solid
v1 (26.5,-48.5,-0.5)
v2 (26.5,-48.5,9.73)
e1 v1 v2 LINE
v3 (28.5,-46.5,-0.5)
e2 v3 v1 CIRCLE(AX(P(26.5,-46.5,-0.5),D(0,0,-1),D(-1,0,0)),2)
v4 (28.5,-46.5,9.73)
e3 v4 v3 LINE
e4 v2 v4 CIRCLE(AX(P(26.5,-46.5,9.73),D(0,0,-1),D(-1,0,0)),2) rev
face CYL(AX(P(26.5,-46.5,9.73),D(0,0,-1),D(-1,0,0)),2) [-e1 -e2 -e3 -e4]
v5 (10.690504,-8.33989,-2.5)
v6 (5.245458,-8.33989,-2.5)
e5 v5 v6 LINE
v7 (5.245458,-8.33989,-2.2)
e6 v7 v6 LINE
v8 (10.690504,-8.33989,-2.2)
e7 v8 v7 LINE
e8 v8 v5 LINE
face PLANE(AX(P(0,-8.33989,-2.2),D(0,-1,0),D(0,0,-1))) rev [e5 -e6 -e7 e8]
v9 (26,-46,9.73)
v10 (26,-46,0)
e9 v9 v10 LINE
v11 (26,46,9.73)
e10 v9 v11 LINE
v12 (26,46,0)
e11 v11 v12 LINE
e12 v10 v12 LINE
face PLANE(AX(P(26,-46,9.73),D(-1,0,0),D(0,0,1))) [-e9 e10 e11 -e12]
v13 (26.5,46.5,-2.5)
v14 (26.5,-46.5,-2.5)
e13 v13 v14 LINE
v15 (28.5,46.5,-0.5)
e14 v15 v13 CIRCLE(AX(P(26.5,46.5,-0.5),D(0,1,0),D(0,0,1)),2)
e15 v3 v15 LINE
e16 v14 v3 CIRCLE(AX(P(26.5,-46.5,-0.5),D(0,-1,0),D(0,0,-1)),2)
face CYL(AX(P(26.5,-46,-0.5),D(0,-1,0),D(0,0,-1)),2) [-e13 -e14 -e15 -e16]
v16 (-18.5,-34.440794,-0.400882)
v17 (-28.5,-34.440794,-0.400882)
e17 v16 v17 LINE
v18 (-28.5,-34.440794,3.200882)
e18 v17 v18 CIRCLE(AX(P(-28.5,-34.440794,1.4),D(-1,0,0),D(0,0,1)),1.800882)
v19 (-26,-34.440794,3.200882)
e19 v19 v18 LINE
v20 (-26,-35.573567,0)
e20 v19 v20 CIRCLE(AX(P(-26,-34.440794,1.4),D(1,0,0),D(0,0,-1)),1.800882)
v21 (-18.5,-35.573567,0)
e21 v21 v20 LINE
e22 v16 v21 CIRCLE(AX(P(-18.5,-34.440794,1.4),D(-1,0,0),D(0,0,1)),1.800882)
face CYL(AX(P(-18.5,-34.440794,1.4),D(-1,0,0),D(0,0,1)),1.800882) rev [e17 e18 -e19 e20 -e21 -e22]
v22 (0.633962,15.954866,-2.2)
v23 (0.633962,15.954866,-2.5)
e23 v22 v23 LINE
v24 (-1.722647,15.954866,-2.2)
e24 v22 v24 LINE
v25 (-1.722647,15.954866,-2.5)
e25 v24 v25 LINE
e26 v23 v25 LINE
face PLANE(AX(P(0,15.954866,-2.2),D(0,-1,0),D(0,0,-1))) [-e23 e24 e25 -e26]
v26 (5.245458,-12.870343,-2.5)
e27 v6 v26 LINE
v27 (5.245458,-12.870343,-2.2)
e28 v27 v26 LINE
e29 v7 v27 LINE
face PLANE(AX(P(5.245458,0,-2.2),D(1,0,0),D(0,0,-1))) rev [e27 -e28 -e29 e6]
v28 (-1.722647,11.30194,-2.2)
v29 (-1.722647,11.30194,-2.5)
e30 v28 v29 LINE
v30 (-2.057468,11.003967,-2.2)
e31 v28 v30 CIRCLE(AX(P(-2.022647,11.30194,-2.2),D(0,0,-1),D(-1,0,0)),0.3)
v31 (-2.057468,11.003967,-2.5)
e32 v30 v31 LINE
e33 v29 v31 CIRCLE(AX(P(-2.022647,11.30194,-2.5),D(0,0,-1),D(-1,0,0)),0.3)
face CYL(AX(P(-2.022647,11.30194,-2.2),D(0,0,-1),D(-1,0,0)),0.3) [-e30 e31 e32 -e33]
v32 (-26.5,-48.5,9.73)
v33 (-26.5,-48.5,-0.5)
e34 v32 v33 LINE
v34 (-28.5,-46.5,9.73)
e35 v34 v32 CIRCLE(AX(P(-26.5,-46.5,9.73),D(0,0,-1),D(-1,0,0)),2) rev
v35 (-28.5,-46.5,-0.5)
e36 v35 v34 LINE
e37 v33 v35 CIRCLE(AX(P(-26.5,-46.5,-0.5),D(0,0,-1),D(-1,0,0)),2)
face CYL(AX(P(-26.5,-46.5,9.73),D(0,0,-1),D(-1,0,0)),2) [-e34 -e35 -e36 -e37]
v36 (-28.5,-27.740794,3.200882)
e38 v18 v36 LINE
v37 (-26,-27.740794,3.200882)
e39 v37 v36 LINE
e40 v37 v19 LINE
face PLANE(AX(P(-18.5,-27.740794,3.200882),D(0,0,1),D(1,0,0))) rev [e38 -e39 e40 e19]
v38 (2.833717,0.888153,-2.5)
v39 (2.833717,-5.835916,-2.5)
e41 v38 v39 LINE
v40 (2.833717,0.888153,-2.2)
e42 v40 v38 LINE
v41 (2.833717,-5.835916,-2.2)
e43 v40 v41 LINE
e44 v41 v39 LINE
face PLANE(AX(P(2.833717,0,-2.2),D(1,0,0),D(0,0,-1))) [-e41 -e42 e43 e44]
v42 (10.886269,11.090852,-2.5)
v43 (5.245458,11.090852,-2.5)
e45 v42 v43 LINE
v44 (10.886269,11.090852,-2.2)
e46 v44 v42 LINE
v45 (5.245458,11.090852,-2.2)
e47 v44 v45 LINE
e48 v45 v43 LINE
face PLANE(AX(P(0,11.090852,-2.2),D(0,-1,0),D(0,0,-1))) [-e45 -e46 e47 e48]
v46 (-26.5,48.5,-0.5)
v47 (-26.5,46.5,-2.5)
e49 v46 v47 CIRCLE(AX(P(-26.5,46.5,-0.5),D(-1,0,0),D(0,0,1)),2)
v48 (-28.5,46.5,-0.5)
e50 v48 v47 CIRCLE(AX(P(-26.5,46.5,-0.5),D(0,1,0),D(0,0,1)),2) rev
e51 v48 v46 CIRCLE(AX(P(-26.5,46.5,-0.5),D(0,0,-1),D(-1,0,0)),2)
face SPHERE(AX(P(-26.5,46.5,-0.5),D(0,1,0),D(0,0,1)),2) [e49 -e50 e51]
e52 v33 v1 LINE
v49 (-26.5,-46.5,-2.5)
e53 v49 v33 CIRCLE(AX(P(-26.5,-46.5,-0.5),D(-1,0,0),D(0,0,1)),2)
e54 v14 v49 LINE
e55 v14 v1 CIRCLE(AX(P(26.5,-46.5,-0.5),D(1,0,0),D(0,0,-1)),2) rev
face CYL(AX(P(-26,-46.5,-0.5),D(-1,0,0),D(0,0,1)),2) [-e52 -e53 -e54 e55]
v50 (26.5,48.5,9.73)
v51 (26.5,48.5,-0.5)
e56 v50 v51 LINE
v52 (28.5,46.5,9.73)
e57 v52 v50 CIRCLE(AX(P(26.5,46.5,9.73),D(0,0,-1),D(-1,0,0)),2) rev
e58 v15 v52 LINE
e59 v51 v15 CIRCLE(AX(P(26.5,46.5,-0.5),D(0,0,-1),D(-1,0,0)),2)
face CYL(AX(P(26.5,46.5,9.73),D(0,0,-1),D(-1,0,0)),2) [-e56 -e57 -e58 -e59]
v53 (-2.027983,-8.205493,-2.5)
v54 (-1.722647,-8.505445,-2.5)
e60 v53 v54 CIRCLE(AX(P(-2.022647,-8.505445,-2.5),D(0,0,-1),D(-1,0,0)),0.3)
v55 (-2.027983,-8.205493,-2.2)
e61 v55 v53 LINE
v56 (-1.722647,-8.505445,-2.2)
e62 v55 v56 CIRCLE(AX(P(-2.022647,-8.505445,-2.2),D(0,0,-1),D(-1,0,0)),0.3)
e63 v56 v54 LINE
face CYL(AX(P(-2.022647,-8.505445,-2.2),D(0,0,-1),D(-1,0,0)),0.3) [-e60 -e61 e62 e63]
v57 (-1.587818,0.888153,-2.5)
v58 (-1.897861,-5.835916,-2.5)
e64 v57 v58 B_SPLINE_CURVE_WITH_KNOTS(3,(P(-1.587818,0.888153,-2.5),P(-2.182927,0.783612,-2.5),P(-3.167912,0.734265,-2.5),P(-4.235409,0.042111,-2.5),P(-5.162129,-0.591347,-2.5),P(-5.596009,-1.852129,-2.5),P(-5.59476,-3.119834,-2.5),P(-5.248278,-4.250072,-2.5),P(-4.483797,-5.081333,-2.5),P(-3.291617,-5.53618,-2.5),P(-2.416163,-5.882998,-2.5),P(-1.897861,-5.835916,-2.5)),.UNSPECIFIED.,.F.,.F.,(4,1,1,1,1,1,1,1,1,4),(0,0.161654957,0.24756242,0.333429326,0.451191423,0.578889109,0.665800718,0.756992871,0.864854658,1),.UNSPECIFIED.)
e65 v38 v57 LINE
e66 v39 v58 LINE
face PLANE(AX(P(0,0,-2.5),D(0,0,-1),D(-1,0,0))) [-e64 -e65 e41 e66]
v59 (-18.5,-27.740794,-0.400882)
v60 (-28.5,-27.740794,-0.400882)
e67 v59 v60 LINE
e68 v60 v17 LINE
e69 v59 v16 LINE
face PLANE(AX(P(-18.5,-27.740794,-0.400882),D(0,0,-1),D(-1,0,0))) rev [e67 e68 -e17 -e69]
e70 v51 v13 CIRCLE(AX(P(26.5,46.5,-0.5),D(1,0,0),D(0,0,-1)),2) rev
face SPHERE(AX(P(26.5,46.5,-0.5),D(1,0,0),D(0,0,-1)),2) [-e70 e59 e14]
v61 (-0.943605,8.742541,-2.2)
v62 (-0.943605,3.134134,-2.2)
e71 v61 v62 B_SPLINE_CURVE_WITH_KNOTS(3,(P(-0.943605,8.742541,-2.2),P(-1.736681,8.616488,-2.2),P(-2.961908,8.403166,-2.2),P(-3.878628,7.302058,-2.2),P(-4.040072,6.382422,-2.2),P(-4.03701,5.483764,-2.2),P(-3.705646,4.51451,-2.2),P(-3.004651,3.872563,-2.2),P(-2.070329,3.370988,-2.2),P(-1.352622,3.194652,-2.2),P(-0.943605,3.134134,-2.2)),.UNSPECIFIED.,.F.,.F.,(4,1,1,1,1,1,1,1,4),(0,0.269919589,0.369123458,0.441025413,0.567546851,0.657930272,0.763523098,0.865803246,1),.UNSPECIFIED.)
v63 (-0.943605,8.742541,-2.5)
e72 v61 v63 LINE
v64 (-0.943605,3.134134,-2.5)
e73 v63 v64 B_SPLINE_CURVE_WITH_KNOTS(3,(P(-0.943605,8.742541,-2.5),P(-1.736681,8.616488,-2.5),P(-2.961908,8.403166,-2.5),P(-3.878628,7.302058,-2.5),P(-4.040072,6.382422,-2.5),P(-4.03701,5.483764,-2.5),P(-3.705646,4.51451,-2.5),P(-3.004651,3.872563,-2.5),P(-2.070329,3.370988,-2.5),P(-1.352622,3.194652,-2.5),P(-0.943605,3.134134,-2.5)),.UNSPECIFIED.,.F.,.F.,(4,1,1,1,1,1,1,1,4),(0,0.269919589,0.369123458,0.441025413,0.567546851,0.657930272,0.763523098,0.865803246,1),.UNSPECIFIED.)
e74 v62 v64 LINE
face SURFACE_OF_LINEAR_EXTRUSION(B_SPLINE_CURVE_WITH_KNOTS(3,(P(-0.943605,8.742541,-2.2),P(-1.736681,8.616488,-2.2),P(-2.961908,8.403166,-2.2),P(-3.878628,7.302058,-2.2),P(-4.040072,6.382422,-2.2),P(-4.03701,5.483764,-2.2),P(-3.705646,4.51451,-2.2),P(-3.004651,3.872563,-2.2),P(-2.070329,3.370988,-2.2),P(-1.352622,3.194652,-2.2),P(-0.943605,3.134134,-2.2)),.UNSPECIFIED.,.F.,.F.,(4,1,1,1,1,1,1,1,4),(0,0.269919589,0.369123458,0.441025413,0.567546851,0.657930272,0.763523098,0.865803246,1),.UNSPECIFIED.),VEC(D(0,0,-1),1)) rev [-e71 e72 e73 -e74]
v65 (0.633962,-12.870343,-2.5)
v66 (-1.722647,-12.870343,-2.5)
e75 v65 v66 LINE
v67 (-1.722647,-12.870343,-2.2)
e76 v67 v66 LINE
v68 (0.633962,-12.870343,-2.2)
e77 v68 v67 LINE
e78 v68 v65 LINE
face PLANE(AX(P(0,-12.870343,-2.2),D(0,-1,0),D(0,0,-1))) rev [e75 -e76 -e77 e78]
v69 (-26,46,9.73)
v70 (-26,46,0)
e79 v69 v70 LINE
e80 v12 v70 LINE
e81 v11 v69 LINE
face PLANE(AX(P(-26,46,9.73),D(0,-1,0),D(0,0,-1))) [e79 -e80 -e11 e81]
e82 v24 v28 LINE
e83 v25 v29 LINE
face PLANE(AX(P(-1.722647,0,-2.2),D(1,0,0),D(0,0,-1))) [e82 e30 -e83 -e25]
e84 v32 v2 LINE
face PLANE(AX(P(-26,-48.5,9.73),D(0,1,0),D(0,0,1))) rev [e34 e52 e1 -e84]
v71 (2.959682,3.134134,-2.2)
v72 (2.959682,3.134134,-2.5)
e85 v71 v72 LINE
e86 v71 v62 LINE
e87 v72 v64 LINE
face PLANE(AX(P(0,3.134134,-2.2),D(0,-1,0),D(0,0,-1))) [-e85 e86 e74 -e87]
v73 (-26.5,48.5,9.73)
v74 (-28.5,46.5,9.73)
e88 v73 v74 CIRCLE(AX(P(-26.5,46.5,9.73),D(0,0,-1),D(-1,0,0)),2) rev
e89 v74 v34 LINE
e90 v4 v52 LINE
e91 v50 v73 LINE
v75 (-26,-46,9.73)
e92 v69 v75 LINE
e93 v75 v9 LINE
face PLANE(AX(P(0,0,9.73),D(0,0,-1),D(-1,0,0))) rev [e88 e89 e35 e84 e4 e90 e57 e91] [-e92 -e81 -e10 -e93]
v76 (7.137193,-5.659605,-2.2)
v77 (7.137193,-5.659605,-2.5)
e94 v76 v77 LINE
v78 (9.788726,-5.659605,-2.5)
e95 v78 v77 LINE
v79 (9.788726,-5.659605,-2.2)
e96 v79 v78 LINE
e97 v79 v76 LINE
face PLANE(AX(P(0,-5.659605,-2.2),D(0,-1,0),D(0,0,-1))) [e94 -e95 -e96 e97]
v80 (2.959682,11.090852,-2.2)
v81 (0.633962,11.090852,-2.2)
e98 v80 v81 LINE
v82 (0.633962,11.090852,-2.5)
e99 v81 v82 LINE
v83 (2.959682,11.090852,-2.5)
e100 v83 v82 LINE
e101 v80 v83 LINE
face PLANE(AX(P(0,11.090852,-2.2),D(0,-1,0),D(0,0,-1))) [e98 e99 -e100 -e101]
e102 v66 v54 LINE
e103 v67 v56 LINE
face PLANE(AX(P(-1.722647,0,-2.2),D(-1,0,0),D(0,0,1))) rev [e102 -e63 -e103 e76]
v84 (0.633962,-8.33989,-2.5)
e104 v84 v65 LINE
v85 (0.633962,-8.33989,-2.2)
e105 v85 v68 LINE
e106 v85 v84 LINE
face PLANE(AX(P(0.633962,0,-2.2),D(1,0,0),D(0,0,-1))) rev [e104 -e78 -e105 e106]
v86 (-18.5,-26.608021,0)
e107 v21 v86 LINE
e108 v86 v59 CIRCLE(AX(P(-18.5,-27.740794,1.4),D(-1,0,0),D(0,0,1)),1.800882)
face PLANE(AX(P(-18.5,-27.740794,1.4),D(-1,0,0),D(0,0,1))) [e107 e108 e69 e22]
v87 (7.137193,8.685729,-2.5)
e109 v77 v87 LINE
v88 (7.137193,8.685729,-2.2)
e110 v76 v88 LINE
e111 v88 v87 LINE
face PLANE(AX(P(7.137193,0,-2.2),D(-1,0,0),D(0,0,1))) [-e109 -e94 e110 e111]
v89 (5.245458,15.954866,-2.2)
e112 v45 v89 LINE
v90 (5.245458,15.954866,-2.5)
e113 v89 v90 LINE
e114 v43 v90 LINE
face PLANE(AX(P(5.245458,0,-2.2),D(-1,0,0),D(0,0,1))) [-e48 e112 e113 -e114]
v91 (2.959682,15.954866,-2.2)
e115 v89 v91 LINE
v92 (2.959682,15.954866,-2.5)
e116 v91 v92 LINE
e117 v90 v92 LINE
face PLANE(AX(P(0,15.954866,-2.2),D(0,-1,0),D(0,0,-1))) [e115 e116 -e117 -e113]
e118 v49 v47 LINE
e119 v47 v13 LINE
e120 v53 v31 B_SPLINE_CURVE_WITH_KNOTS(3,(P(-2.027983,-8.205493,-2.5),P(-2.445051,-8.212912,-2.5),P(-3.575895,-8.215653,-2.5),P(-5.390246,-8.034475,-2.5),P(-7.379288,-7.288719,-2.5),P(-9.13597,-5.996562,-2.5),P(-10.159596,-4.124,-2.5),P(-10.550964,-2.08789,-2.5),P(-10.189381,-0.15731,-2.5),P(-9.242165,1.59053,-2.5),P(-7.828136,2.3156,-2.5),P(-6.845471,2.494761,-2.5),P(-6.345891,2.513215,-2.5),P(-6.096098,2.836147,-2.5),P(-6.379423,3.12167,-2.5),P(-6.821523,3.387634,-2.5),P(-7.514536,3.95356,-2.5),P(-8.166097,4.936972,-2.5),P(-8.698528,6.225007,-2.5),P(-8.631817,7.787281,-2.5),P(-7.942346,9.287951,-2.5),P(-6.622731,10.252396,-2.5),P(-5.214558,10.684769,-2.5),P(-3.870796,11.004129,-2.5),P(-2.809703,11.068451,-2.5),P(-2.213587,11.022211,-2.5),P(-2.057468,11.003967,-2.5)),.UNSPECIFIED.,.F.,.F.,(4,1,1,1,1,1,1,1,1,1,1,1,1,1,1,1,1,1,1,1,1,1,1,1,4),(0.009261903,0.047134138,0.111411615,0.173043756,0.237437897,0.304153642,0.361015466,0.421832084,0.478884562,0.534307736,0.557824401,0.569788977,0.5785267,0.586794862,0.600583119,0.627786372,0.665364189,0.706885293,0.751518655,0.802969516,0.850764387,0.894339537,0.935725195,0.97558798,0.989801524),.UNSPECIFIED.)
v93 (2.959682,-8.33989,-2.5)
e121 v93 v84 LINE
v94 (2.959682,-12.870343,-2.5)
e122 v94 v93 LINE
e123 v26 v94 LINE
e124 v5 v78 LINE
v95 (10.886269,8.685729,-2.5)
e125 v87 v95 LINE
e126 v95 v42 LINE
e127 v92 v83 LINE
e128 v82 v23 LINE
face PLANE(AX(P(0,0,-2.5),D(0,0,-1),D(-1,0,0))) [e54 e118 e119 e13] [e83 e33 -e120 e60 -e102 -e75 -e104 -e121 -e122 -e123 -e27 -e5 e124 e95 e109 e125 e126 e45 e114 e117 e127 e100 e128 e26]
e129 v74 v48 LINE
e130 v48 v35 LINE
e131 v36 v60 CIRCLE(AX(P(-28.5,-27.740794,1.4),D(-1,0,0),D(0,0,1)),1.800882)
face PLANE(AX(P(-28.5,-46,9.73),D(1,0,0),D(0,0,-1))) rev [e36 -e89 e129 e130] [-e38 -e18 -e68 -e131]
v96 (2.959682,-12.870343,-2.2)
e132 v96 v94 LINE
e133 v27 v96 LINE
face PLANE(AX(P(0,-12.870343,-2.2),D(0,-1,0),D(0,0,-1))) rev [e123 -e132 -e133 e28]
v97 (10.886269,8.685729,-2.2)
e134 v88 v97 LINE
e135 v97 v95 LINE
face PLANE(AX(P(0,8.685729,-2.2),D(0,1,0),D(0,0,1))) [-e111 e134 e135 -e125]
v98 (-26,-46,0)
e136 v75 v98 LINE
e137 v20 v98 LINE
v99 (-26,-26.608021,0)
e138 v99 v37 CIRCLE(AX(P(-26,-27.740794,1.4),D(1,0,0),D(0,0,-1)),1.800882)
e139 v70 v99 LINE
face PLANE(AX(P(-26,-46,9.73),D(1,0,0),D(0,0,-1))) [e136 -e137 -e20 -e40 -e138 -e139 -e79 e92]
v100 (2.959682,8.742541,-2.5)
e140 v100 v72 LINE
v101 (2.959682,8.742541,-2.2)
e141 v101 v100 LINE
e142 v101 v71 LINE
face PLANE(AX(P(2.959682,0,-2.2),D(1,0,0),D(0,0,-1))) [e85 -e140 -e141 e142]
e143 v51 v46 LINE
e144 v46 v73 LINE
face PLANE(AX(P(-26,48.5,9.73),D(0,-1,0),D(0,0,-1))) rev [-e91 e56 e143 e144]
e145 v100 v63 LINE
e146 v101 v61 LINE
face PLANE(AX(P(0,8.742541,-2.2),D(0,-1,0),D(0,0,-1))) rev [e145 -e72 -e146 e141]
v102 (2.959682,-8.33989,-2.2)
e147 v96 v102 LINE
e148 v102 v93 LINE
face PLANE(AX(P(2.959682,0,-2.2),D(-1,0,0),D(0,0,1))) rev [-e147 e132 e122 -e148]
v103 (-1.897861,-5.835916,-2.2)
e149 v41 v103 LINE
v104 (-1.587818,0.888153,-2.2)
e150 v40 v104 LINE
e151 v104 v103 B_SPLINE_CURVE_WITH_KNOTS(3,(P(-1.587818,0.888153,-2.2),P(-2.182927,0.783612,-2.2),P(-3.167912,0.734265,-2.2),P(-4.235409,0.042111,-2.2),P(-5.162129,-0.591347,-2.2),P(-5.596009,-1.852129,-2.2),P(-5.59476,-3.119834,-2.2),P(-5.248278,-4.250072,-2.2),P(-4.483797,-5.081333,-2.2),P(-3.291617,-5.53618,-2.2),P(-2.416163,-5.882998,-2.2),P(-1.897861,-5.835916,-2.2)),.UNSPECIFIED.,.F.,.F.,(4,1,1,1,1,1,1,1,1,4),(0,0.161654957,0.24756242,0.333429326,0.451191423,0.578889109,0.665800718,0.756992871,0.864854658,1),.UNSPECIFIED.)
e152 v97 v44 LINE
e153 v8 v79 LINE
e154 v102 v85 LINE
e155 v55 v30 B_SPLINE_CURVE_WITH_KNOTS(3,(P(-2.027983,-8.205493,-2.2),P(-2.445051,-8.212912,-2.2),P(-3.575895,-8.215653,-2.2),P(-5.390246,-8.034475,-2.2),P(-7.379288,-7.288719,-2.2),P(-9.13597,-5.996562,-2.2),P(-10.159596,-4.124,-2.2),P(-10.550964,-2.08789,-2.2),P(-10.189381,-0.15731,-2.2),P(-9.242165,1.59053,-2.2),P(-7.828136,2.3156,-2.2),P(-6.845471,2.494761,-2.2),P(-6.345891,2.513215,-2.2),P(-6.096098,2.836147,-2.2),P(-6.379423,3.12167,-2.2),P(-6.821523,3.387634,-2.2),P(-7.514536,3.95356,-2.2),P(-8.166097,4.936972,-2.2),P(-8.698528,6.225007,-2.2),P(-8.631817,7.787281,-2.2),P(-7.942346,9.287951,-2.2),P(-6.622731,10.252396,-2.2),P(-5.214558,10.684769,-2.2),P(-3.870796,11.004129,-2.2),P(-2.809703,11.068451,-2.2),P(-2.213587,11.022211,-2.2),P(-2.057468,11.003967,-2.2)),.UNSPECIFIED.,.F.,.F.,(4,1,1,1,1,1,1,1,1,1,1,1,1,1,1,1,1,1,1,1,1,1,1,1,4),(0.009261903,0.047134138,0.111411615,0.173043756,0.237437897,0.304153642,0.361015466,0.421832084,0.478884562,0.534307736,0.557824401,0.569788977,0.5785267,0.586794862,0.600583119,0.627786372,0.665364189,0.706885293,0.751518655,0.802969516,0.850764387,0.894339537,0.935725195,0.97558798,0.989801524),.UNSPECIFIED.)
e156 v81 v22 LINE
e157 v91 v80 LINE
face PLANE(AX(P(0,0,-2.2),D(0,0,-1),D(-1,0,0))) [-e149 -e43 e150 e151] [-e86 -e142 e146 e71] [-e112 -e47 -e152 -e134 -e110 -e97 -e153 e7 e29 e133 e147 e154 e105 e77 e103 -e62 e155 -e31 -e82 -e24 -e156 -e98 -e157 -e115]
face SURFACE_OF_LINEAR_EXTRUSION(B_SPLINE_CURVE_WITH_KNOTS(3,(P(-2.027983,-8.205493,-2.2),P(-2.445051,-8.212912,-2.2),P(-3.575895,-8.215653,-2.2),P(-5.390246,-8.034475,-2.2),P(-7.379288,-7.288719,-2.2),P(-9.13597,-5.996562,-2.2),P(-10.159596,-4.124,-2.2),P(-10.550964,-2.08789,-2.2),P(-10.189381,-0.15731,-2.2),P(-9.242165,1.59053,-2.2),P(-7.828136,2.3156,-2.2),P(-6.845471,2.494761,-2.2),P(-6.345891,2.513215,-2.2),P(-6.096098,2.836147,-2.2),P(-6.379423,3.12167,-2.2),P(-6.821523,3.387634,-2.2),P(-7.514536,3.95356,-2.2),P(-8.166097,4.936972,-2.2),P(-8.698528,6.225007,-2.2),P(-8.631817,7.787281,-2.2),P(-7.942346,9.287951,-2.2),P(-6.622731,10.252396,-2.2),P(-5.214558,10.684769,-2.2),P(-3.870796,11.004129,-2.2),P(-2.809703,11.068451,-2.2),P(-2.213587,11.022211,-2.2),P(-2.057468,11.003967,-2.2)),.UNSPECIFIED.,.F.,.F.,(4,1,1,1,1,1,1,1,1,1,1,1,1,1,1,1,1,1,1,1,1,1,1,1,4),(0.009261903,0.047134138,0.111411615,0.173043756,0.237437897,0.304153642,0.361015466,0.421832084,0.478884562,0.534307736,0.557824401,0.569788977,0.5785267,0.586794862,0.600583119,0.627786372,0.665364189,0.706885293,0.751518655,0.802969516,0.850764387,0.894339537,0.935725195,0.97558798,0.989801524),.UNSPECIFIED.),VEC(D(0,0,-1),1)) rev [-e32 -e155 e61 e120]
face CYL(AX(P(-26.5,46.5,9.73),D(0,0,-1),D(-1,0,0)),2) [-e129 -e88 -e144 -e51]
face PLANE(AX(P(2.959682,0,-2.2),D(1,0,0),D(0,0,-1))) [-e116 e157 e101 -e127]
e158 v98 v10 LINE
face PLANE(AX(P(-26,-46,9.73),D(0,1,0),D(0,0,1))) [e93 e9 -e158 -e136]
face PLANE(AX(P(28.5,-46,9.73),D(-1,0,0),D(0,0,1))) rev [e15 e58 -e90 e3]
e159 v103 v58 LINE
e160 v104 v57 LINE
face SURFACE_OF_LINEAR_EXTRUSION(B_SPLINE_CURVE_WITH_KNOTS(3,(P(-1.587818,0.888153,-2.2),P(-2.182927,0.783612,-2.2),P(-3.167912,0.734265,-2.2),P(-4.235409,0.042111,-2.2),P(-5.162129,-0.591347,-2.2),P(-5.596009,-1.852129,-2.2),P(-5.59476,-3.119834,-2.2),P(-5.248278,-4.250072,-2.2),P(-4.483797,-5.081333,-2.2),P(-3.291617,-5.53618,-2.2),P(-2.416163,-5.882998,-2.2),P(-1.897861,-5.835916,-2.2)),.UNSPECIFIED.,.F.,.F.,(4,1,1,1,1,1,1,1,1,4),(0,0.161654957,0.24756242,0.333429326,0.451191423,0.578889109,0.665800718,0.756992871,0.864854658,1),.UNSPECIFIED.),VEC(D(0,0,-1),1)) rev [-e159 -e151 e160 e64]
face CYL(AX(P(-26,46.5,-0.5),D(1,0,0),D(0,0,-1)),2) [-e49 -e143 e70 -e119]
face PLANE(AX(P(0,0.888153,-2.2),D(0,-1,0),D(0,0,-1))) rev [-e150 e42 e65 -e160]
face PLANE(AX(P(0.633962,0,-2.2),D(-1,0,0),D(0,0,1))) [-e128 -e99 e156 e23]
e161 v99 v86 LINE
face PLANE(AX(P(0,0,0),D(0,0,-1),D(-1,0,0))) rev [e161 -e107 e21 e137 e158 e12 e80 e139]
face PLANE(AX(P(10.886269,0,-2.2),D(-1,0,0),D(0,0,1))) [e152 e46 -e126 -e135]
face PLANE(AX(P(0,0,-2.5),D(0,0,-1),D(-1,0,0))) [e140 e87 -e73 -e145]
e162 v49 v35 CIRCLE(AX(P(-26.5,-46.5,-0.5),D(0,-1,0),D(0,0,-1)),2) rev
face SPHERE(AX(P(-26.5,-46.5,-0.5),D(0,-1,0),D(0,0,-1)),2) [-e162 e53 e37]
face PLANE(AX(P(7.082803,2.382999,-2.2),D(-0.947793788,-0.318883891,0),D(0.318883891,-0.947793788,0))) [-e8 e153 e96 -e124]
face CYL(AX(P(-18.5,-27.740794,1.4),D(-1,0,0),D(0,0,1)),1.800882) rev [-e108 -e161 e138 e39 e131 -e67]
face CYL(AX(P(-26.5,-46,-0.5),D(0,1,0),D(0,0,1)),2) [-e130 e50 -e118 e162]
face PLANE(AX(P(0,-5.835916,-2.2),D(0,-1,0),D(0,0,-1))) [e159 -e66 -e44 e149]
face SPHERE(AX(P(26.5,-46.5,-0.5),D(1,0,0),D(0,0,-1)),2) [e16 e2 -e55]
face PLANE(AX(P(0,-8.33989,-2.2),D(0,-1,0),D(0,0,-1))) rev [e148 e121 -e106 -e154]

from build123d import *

# Parameters (mm, degrees)
ESQUISSE1_W             = 52
ESQUISSE1_H             = 92
BOSS_EXTRU_1_DEPTH      = 9.73
COQUE1_T                = 2.5
CONG_1_R                = 2
ENL_V_MAT_EXTRU_1_DEPTH = 10
ENL_V_MAT_EXTRU_3_DEPTH = 0.3


with BuildPart() as part:
    # Esquisse1 → Boss.-Extru.1 (new body)
    with BuildSketch(Plane.XY):
        Rectangle(ESQUISSE1_W, ESQUISSE1_H)
    extrude(amount=BOSS_EXTRU_1_DEPTH)

    # Coque1
    coque1_openings = [part.faces().sort_by_distance(p)[0] for p in [
        (0, 0, 9.73),
    ]]
    offset(amount=COQUE1_T, openings=coque1_openings, kind=Kind.INTERSECTION)

    # Congé1
    # the kernel refuses this fillet: 2 mm, written as the material it takes off along each edge
    with BuildSketch(Plane(origin=(-26.5, -46.5, -0.5), x_dir=(0, 0, -1), z_dir=(-1, 0, 0))) as cong_1_piece_1_section:
        Polygon((0, 0), (CONG_1_R, 0), (CONG_1_R, CONG_1_R), (0, CONG_1_R), align=None)
    cong_1_piece_1 = extrude(amount=CONG_1_R, mode=Mode.PRIVATE)
    cong_1_piece_1 = cong_1_piece_1 - Plane(origin=(-26.5, -46.5, -0.5), x_dir=(0, 0.7071067811865475, 0.7071067811865475), z_dir=(-1, 0, 0)) * Sphere(CONG_1_R, mode=Mode.PRIVATE)
    add(cong_1_piece_1, mode=Mode.SUBTRACT)
    with BuildSketch(Plane(origin=(26.5, -46.5, -0.5), x_dir=(0, -1, 0), z_dir=(0, 0, -1))) as cong_1_piece_2_section:
        Polygon((0, 0), (CONG_1_R, 0), (CONG_1_R, -CONG_1_R), (0, -CONG_1_R), align=None)
    cong_1_piece_2 = extrude(amount=CONG_1_R, mode=Mode.PRIVATE)
    cong_1_piece_2 = cong_1_piece_2 - Plane(origin=(26.5, -46.5, -0.5), x_dir=(-0.7071067811865475, 0.7071067811865475, 0), z_dir=(0, 0, -1)) * Sphere(CONG_1_R, mode=Mode.PRIVATE)
    add(cong_1_piece_2, mode=Mode.SUBTRACT)
    with BuildSketch(Plane(origin=(-26.5, 46.5, -0.5), x_dir=(-1, 0, 0), z_dir=(0, 1, 0))) as cong_1_piece_3_section:
        Polygon((0, 0), (CONG_1_R, 0), (CONG_1_R, -CONG_1_R), (0, -CONG_1_R), align=None)
    cong_1_piece_3 = extrude(amount=CONG_1_R, mode=Mode.PRIVATE)
    cong_1_piece_3 = cong_1_piece_3 - Plane(origin=(-26.5, 46.5, -0.5), x_dir=(0.7071067811865475, 0, 0.7071067811865475), z_dir=(0, 1, 0)) * Sphere(CONG_1_R, mode=Mode.PRIVATE)
    add(cong_1_piece_3, mode=Mode.SUBTRACT)
    with BuildSketch(Plane(origin=(26.5, 46.5, -0.5), x_dir=(0, 0, -1), z_dir=(0, 1, 0))) as cong_1_piece_4_section:
        Polygon((0, 0), (CONG_1_R, 0), (CONG_1_R, -CONG_1_R), (0, -CONG_1_R), align=None)
    cong_1_piece_4 = extrude(amount=CONG_1_R, mode=Mode.PRIVATE)
    cong_1_piece_4 = cong_1_piece_4 - Plane(origin=(26.5, 46.5, -0.5), x_dir=(-0.7071067811865475, 0, 0.7071067811865475), z_dir=(0, 1, 0)) * Sphere(CONG_1_R, mode=Mode.PRIVATE)
    add(cong_1_piece_4, mode=Mode.SUBTRACT)
    with BuildSketch(Plane(origin=(-26.5, -48.5, -2.5), x_dir=(0, 0, 1), z_dir=(1, 0, 0)), Plane(origin=(26.5, 48.5, -2.5), x_dir=(0, 0, 1), z_dir=(-1, 0, 0))) as cong_1_piece_5:
        with BuildLine():
            CenterArc((CONG_1_R, -CONG_1_R), CONG_1_R, 90, 90)
            Line((0, -CONG_1_R), (0, 0))
            Line((0, 0), (CONG_1_R, 0))
        make_face()
    extrude(amount=53, mode=Mode.SUBTRACT)
    with BuildSketch(Plane(origin=(-28.5, 46.5, -2.5), x_dir=(0, 0, 1), z_dir=(0, -1, 0)), Plane(origin=(28.5, -46.5, -2.5), x_dir=(0, 0, 1), z_dir=(0, 1, 0))) as cong_1_piece_6:
        with BuildLine():
            CenterArc((CONG_1_R, -CONG_1_R), CONG_1_R, 90, 90)
            Line((0, -CONG_1_R), (0, 0))
            Line((0, 0), (CONG_1_R, 0))
        make_face()
    extrude(amount=93, mode=Mode.SUBTRACT)
    with BuildSketch(Plane(origin=(28.5, -48.5, -0.5), x_dir=(-1, 0, 0), z_dir=(0, 0, 1)), Plane(origin=(-28.5, -48.5, 14.73), x_dir=(1, 0, 0), z_dir=(0, 0, -1)), Plane(origin=(-28.5, 48.5, -0.5), x_dir=(1, 0, 0), z_dir=(0, 0, 1)), Plane(origin=(28.5, 48.5, -0.5), x_dir=(0, -1, 0), z_dir=(0, 0, 1))) as cong_1_piece_7:
        with BuildLine():
            CenterArc((CONG_1_R, -CONG_1_R), CONG_1_R, 90, 90)
            Line((0, -CONG_1_R), (0, 0))
            Line((0, 0), (CONG_1_R, 0))
        make_face()
    extrude(amount=15.23, mode=Mode.SUBTRACT)

    # Esquisse2 → Enlèv. mat.-Extru.1 (cut)
    with BuildSketch(Plane.ZY.offset(28.5)):
        with BuildLine():
            Line((3.2008816, -27.740794349), (3.2008816, -34.440794349))
            ThreePointArc((3.2008816, -34.440794349), (1.4, -36.241675948), (-0.4008816, -34.440794349))
            Line((-0.4008816, -34.440794349), (-0.4008816, -27.740794349))
            ThreePointArc((-0.4008816, -27.740794349), (1.4, -25.939912749), (3.2008816, -27.740794349))
        make_face()
    extrude(amount=-ENL_V_MAT_EXTRU_1_DEPTH, mode=Mode.SUBTRACT)

    # Esquisse3 → Enlèv. mat.-Extru.3 (cut)
    with BuildSketch(Plane(origin=(2.40458604, 5.05579629, -2.5), x_dir=(-1, 0, 0), z_dir=(0, 0, -1))):
        with BuildLine():
            ThreePointArc((4.432568846, -13.261288916), (4.216995781, -13.347231146), (4.12723276, -13.561241456))
            Line((4.12723276, -13.561241456), (4.12723276, -17.926139223))
            Line((4.12723276, -17.926139223), (1.770623661, -17.926139223))
            Line((1.770623661, -17.926139223), (1.770623661, -13.395686185))
            Line((1.770623661, -13.395686185), (-0.5550959, -13.395686185))
            Line((-0.5550959, -13.395686185), (-0.5550959, -17.926139223))
            Line((-0.5550959, -17.926139223), (-2.840872053, -17.926139223))
            Line((-2.840872053, -17.926139223), (-2.840872053, -13.395686185))
            Line((-2.840872053, -13.395686185), (-8.285917815, -13.395686185))
            Line((-8.285917815, -13.395686185), (-7.384139614, -10.715400976))
            Line((-7.384139614, -10.715400976), (-4.73260744, -10.715400976))
            Line((-4.73260744, -10.715400976), (-4.73260744, 3.629932304))
            Line((-4.73260744, 3.629932304), (-8.481683027, 3.629932304))
            Line((-8.481683027, 3.629932304), (-8.481683027, 6.035056002))
            Line((-8.481683027, 6.035056002), (-2.840872053, 6.035056002))
            Line((-2.840872053, 6.035056002), (-2.840872053, 10.899070066))
            Line((-2.840872053, 10.899070066), (-0.5550959, 10.899070066))
            Line((-0.5550959, 10.899070066), (-0.5550959, 6.035056002))
            Line((-0.5550959, 6.035056002), (1.770623661, 6.035056002))
            Line((1.770623661, 6.035056002), (1.770623661, 10.899070066))
            Line((1.770623661, 10.899070066), (4.12723276, 10.899070066))
            Line((4.12723276, 10.899070066), (4.12723276, 6.246143352))
            ThreePointArc((4.12723276, 6.246143352), (4.227791491, 6.022038064), (4.46205396, 5.948171065))
            add(Edge.make_bspline(
                [(4.432568846, -13.261288916), (4.849636806, -13.268708458), (5.98048136, -13.271449308), (7.794832478, -13.090271032), (9.783873696, -12.344515621), (11.540556036, -11.052358459), (12.564181649, -9.179795832), (12.955550354, -7.143685881), (12.593966957, -5.21310593), (11.646751192, -3.465266484), (10.232722145, -2.740195794), (9.250057043, -2.561034839), (8.750477475, -2.542580923), (8.50068383, -2.219648818), (8.784009377, -1.934125986), (9.226109387, -1.668162515), (9.919121901, -1.102236302), (10.570682868, -0.118824042), (11.103114061, 1.16921053), (11.036403439, 2.73148482), (10.346932114, 4.232154462), (9.027316851, 5.196599259), (7.619143878, 5.628972396), (6.275382284, 5.94833303), (5.214289363, 6.012654431), (4.618172733, 5.966415188), (4.46205396, 5.948171065)],
                knots=[0.009261903, 0.009261903, 0.009261903, 0.009261903, 0.047134138, 0.111411615, 0.173043756, 0.237437897, 0.304153642, 0.361015466, 0.421832084, 0.478884562, 0.534307736, 0.557824401, 0.569788977, 0.5785267, 0.586794862, 0.600583119, 0.627786372, 0.665364189, 0.706885293, 0.751518655, 0.802969516, 0.850764387, 0.894339537, 0.935725195, 0.97558798, 0.989801524, 0.989801524, 0.989801524, 0.989801524], degree=3))
        make_face()
        with BuildLine():
            Line((-0.5550959, 3.686744271), (3.348191015, 3.686744271))
            add(Edge.make_bspline(
                [(3.348191015, 3.686744271), (4.141267216, 3.56069148), (5.366493628, 3.347369666), (6.283213897, 2.246261692), (6.444658055, 1.326625386), (6.441596122, 0.427967574), (6.110231896, -0.541286606), (5.40923725, -1.183233231), (4.474914869, -1.684808073), (3.757208507, -1.861144467), (3.348191015, -1.921662594)],
                knots=[0, 0, 0, 0, 0.269919589, 0.369123458, 0.441025413, 0.567546851, 0.657930272, 0.763523098, 0.865803246, 1, 1, 1, 1], degree=3))
            Line((3.348191015, -1.921662594), (-0.5550959, -1.921662594))
            Line((-0.5550959, -1.921662594), (-0.5550959, 3.686744271))
        make_face(mode=Mode.SUBTRACT)
        with BuildLine():
            Line((-0.42913087, -4.167643381), (3.992403585, -4.167643381))
            add(Edge.make_bspline(
                [(3.992403585, -4.167643381), (4.587512864, -4.272183954), (5.572497818, -4.32153134), (6.639994555, -5.013685273), (7.566714866, -5.647143489), (8.000595426, -6.907925525), (7.999345796, -8.175630682), (7.65286389, -9.305868029), (6.888383055, -10.137129269), (5.696203316, -10.591976345), (4.820749189, -10.938794377), (4.302446939, -10.89171276)],
                knots=[0, 0, 0, 0, 0.161654957, 0.24756242, 0.333429326, 0.451191423, 0.578889109, 0.665800718, 0.756992871, 0.864854658, 1, 1, 1, 1], degree=3))
            Line((4.302446939, -10.89171276), (-0.42913087, -10.89171276))
            Line((-0.42913087, -10.89171276), (-0.42913087, -4.167643381))
        make_face(mode=Mode.SUBTRACT)
    extrude(amount=-ENL_V_MAT_EXTRU_3_DEPTH, mode=Mode.SUBTRACT)


solid = part.part
